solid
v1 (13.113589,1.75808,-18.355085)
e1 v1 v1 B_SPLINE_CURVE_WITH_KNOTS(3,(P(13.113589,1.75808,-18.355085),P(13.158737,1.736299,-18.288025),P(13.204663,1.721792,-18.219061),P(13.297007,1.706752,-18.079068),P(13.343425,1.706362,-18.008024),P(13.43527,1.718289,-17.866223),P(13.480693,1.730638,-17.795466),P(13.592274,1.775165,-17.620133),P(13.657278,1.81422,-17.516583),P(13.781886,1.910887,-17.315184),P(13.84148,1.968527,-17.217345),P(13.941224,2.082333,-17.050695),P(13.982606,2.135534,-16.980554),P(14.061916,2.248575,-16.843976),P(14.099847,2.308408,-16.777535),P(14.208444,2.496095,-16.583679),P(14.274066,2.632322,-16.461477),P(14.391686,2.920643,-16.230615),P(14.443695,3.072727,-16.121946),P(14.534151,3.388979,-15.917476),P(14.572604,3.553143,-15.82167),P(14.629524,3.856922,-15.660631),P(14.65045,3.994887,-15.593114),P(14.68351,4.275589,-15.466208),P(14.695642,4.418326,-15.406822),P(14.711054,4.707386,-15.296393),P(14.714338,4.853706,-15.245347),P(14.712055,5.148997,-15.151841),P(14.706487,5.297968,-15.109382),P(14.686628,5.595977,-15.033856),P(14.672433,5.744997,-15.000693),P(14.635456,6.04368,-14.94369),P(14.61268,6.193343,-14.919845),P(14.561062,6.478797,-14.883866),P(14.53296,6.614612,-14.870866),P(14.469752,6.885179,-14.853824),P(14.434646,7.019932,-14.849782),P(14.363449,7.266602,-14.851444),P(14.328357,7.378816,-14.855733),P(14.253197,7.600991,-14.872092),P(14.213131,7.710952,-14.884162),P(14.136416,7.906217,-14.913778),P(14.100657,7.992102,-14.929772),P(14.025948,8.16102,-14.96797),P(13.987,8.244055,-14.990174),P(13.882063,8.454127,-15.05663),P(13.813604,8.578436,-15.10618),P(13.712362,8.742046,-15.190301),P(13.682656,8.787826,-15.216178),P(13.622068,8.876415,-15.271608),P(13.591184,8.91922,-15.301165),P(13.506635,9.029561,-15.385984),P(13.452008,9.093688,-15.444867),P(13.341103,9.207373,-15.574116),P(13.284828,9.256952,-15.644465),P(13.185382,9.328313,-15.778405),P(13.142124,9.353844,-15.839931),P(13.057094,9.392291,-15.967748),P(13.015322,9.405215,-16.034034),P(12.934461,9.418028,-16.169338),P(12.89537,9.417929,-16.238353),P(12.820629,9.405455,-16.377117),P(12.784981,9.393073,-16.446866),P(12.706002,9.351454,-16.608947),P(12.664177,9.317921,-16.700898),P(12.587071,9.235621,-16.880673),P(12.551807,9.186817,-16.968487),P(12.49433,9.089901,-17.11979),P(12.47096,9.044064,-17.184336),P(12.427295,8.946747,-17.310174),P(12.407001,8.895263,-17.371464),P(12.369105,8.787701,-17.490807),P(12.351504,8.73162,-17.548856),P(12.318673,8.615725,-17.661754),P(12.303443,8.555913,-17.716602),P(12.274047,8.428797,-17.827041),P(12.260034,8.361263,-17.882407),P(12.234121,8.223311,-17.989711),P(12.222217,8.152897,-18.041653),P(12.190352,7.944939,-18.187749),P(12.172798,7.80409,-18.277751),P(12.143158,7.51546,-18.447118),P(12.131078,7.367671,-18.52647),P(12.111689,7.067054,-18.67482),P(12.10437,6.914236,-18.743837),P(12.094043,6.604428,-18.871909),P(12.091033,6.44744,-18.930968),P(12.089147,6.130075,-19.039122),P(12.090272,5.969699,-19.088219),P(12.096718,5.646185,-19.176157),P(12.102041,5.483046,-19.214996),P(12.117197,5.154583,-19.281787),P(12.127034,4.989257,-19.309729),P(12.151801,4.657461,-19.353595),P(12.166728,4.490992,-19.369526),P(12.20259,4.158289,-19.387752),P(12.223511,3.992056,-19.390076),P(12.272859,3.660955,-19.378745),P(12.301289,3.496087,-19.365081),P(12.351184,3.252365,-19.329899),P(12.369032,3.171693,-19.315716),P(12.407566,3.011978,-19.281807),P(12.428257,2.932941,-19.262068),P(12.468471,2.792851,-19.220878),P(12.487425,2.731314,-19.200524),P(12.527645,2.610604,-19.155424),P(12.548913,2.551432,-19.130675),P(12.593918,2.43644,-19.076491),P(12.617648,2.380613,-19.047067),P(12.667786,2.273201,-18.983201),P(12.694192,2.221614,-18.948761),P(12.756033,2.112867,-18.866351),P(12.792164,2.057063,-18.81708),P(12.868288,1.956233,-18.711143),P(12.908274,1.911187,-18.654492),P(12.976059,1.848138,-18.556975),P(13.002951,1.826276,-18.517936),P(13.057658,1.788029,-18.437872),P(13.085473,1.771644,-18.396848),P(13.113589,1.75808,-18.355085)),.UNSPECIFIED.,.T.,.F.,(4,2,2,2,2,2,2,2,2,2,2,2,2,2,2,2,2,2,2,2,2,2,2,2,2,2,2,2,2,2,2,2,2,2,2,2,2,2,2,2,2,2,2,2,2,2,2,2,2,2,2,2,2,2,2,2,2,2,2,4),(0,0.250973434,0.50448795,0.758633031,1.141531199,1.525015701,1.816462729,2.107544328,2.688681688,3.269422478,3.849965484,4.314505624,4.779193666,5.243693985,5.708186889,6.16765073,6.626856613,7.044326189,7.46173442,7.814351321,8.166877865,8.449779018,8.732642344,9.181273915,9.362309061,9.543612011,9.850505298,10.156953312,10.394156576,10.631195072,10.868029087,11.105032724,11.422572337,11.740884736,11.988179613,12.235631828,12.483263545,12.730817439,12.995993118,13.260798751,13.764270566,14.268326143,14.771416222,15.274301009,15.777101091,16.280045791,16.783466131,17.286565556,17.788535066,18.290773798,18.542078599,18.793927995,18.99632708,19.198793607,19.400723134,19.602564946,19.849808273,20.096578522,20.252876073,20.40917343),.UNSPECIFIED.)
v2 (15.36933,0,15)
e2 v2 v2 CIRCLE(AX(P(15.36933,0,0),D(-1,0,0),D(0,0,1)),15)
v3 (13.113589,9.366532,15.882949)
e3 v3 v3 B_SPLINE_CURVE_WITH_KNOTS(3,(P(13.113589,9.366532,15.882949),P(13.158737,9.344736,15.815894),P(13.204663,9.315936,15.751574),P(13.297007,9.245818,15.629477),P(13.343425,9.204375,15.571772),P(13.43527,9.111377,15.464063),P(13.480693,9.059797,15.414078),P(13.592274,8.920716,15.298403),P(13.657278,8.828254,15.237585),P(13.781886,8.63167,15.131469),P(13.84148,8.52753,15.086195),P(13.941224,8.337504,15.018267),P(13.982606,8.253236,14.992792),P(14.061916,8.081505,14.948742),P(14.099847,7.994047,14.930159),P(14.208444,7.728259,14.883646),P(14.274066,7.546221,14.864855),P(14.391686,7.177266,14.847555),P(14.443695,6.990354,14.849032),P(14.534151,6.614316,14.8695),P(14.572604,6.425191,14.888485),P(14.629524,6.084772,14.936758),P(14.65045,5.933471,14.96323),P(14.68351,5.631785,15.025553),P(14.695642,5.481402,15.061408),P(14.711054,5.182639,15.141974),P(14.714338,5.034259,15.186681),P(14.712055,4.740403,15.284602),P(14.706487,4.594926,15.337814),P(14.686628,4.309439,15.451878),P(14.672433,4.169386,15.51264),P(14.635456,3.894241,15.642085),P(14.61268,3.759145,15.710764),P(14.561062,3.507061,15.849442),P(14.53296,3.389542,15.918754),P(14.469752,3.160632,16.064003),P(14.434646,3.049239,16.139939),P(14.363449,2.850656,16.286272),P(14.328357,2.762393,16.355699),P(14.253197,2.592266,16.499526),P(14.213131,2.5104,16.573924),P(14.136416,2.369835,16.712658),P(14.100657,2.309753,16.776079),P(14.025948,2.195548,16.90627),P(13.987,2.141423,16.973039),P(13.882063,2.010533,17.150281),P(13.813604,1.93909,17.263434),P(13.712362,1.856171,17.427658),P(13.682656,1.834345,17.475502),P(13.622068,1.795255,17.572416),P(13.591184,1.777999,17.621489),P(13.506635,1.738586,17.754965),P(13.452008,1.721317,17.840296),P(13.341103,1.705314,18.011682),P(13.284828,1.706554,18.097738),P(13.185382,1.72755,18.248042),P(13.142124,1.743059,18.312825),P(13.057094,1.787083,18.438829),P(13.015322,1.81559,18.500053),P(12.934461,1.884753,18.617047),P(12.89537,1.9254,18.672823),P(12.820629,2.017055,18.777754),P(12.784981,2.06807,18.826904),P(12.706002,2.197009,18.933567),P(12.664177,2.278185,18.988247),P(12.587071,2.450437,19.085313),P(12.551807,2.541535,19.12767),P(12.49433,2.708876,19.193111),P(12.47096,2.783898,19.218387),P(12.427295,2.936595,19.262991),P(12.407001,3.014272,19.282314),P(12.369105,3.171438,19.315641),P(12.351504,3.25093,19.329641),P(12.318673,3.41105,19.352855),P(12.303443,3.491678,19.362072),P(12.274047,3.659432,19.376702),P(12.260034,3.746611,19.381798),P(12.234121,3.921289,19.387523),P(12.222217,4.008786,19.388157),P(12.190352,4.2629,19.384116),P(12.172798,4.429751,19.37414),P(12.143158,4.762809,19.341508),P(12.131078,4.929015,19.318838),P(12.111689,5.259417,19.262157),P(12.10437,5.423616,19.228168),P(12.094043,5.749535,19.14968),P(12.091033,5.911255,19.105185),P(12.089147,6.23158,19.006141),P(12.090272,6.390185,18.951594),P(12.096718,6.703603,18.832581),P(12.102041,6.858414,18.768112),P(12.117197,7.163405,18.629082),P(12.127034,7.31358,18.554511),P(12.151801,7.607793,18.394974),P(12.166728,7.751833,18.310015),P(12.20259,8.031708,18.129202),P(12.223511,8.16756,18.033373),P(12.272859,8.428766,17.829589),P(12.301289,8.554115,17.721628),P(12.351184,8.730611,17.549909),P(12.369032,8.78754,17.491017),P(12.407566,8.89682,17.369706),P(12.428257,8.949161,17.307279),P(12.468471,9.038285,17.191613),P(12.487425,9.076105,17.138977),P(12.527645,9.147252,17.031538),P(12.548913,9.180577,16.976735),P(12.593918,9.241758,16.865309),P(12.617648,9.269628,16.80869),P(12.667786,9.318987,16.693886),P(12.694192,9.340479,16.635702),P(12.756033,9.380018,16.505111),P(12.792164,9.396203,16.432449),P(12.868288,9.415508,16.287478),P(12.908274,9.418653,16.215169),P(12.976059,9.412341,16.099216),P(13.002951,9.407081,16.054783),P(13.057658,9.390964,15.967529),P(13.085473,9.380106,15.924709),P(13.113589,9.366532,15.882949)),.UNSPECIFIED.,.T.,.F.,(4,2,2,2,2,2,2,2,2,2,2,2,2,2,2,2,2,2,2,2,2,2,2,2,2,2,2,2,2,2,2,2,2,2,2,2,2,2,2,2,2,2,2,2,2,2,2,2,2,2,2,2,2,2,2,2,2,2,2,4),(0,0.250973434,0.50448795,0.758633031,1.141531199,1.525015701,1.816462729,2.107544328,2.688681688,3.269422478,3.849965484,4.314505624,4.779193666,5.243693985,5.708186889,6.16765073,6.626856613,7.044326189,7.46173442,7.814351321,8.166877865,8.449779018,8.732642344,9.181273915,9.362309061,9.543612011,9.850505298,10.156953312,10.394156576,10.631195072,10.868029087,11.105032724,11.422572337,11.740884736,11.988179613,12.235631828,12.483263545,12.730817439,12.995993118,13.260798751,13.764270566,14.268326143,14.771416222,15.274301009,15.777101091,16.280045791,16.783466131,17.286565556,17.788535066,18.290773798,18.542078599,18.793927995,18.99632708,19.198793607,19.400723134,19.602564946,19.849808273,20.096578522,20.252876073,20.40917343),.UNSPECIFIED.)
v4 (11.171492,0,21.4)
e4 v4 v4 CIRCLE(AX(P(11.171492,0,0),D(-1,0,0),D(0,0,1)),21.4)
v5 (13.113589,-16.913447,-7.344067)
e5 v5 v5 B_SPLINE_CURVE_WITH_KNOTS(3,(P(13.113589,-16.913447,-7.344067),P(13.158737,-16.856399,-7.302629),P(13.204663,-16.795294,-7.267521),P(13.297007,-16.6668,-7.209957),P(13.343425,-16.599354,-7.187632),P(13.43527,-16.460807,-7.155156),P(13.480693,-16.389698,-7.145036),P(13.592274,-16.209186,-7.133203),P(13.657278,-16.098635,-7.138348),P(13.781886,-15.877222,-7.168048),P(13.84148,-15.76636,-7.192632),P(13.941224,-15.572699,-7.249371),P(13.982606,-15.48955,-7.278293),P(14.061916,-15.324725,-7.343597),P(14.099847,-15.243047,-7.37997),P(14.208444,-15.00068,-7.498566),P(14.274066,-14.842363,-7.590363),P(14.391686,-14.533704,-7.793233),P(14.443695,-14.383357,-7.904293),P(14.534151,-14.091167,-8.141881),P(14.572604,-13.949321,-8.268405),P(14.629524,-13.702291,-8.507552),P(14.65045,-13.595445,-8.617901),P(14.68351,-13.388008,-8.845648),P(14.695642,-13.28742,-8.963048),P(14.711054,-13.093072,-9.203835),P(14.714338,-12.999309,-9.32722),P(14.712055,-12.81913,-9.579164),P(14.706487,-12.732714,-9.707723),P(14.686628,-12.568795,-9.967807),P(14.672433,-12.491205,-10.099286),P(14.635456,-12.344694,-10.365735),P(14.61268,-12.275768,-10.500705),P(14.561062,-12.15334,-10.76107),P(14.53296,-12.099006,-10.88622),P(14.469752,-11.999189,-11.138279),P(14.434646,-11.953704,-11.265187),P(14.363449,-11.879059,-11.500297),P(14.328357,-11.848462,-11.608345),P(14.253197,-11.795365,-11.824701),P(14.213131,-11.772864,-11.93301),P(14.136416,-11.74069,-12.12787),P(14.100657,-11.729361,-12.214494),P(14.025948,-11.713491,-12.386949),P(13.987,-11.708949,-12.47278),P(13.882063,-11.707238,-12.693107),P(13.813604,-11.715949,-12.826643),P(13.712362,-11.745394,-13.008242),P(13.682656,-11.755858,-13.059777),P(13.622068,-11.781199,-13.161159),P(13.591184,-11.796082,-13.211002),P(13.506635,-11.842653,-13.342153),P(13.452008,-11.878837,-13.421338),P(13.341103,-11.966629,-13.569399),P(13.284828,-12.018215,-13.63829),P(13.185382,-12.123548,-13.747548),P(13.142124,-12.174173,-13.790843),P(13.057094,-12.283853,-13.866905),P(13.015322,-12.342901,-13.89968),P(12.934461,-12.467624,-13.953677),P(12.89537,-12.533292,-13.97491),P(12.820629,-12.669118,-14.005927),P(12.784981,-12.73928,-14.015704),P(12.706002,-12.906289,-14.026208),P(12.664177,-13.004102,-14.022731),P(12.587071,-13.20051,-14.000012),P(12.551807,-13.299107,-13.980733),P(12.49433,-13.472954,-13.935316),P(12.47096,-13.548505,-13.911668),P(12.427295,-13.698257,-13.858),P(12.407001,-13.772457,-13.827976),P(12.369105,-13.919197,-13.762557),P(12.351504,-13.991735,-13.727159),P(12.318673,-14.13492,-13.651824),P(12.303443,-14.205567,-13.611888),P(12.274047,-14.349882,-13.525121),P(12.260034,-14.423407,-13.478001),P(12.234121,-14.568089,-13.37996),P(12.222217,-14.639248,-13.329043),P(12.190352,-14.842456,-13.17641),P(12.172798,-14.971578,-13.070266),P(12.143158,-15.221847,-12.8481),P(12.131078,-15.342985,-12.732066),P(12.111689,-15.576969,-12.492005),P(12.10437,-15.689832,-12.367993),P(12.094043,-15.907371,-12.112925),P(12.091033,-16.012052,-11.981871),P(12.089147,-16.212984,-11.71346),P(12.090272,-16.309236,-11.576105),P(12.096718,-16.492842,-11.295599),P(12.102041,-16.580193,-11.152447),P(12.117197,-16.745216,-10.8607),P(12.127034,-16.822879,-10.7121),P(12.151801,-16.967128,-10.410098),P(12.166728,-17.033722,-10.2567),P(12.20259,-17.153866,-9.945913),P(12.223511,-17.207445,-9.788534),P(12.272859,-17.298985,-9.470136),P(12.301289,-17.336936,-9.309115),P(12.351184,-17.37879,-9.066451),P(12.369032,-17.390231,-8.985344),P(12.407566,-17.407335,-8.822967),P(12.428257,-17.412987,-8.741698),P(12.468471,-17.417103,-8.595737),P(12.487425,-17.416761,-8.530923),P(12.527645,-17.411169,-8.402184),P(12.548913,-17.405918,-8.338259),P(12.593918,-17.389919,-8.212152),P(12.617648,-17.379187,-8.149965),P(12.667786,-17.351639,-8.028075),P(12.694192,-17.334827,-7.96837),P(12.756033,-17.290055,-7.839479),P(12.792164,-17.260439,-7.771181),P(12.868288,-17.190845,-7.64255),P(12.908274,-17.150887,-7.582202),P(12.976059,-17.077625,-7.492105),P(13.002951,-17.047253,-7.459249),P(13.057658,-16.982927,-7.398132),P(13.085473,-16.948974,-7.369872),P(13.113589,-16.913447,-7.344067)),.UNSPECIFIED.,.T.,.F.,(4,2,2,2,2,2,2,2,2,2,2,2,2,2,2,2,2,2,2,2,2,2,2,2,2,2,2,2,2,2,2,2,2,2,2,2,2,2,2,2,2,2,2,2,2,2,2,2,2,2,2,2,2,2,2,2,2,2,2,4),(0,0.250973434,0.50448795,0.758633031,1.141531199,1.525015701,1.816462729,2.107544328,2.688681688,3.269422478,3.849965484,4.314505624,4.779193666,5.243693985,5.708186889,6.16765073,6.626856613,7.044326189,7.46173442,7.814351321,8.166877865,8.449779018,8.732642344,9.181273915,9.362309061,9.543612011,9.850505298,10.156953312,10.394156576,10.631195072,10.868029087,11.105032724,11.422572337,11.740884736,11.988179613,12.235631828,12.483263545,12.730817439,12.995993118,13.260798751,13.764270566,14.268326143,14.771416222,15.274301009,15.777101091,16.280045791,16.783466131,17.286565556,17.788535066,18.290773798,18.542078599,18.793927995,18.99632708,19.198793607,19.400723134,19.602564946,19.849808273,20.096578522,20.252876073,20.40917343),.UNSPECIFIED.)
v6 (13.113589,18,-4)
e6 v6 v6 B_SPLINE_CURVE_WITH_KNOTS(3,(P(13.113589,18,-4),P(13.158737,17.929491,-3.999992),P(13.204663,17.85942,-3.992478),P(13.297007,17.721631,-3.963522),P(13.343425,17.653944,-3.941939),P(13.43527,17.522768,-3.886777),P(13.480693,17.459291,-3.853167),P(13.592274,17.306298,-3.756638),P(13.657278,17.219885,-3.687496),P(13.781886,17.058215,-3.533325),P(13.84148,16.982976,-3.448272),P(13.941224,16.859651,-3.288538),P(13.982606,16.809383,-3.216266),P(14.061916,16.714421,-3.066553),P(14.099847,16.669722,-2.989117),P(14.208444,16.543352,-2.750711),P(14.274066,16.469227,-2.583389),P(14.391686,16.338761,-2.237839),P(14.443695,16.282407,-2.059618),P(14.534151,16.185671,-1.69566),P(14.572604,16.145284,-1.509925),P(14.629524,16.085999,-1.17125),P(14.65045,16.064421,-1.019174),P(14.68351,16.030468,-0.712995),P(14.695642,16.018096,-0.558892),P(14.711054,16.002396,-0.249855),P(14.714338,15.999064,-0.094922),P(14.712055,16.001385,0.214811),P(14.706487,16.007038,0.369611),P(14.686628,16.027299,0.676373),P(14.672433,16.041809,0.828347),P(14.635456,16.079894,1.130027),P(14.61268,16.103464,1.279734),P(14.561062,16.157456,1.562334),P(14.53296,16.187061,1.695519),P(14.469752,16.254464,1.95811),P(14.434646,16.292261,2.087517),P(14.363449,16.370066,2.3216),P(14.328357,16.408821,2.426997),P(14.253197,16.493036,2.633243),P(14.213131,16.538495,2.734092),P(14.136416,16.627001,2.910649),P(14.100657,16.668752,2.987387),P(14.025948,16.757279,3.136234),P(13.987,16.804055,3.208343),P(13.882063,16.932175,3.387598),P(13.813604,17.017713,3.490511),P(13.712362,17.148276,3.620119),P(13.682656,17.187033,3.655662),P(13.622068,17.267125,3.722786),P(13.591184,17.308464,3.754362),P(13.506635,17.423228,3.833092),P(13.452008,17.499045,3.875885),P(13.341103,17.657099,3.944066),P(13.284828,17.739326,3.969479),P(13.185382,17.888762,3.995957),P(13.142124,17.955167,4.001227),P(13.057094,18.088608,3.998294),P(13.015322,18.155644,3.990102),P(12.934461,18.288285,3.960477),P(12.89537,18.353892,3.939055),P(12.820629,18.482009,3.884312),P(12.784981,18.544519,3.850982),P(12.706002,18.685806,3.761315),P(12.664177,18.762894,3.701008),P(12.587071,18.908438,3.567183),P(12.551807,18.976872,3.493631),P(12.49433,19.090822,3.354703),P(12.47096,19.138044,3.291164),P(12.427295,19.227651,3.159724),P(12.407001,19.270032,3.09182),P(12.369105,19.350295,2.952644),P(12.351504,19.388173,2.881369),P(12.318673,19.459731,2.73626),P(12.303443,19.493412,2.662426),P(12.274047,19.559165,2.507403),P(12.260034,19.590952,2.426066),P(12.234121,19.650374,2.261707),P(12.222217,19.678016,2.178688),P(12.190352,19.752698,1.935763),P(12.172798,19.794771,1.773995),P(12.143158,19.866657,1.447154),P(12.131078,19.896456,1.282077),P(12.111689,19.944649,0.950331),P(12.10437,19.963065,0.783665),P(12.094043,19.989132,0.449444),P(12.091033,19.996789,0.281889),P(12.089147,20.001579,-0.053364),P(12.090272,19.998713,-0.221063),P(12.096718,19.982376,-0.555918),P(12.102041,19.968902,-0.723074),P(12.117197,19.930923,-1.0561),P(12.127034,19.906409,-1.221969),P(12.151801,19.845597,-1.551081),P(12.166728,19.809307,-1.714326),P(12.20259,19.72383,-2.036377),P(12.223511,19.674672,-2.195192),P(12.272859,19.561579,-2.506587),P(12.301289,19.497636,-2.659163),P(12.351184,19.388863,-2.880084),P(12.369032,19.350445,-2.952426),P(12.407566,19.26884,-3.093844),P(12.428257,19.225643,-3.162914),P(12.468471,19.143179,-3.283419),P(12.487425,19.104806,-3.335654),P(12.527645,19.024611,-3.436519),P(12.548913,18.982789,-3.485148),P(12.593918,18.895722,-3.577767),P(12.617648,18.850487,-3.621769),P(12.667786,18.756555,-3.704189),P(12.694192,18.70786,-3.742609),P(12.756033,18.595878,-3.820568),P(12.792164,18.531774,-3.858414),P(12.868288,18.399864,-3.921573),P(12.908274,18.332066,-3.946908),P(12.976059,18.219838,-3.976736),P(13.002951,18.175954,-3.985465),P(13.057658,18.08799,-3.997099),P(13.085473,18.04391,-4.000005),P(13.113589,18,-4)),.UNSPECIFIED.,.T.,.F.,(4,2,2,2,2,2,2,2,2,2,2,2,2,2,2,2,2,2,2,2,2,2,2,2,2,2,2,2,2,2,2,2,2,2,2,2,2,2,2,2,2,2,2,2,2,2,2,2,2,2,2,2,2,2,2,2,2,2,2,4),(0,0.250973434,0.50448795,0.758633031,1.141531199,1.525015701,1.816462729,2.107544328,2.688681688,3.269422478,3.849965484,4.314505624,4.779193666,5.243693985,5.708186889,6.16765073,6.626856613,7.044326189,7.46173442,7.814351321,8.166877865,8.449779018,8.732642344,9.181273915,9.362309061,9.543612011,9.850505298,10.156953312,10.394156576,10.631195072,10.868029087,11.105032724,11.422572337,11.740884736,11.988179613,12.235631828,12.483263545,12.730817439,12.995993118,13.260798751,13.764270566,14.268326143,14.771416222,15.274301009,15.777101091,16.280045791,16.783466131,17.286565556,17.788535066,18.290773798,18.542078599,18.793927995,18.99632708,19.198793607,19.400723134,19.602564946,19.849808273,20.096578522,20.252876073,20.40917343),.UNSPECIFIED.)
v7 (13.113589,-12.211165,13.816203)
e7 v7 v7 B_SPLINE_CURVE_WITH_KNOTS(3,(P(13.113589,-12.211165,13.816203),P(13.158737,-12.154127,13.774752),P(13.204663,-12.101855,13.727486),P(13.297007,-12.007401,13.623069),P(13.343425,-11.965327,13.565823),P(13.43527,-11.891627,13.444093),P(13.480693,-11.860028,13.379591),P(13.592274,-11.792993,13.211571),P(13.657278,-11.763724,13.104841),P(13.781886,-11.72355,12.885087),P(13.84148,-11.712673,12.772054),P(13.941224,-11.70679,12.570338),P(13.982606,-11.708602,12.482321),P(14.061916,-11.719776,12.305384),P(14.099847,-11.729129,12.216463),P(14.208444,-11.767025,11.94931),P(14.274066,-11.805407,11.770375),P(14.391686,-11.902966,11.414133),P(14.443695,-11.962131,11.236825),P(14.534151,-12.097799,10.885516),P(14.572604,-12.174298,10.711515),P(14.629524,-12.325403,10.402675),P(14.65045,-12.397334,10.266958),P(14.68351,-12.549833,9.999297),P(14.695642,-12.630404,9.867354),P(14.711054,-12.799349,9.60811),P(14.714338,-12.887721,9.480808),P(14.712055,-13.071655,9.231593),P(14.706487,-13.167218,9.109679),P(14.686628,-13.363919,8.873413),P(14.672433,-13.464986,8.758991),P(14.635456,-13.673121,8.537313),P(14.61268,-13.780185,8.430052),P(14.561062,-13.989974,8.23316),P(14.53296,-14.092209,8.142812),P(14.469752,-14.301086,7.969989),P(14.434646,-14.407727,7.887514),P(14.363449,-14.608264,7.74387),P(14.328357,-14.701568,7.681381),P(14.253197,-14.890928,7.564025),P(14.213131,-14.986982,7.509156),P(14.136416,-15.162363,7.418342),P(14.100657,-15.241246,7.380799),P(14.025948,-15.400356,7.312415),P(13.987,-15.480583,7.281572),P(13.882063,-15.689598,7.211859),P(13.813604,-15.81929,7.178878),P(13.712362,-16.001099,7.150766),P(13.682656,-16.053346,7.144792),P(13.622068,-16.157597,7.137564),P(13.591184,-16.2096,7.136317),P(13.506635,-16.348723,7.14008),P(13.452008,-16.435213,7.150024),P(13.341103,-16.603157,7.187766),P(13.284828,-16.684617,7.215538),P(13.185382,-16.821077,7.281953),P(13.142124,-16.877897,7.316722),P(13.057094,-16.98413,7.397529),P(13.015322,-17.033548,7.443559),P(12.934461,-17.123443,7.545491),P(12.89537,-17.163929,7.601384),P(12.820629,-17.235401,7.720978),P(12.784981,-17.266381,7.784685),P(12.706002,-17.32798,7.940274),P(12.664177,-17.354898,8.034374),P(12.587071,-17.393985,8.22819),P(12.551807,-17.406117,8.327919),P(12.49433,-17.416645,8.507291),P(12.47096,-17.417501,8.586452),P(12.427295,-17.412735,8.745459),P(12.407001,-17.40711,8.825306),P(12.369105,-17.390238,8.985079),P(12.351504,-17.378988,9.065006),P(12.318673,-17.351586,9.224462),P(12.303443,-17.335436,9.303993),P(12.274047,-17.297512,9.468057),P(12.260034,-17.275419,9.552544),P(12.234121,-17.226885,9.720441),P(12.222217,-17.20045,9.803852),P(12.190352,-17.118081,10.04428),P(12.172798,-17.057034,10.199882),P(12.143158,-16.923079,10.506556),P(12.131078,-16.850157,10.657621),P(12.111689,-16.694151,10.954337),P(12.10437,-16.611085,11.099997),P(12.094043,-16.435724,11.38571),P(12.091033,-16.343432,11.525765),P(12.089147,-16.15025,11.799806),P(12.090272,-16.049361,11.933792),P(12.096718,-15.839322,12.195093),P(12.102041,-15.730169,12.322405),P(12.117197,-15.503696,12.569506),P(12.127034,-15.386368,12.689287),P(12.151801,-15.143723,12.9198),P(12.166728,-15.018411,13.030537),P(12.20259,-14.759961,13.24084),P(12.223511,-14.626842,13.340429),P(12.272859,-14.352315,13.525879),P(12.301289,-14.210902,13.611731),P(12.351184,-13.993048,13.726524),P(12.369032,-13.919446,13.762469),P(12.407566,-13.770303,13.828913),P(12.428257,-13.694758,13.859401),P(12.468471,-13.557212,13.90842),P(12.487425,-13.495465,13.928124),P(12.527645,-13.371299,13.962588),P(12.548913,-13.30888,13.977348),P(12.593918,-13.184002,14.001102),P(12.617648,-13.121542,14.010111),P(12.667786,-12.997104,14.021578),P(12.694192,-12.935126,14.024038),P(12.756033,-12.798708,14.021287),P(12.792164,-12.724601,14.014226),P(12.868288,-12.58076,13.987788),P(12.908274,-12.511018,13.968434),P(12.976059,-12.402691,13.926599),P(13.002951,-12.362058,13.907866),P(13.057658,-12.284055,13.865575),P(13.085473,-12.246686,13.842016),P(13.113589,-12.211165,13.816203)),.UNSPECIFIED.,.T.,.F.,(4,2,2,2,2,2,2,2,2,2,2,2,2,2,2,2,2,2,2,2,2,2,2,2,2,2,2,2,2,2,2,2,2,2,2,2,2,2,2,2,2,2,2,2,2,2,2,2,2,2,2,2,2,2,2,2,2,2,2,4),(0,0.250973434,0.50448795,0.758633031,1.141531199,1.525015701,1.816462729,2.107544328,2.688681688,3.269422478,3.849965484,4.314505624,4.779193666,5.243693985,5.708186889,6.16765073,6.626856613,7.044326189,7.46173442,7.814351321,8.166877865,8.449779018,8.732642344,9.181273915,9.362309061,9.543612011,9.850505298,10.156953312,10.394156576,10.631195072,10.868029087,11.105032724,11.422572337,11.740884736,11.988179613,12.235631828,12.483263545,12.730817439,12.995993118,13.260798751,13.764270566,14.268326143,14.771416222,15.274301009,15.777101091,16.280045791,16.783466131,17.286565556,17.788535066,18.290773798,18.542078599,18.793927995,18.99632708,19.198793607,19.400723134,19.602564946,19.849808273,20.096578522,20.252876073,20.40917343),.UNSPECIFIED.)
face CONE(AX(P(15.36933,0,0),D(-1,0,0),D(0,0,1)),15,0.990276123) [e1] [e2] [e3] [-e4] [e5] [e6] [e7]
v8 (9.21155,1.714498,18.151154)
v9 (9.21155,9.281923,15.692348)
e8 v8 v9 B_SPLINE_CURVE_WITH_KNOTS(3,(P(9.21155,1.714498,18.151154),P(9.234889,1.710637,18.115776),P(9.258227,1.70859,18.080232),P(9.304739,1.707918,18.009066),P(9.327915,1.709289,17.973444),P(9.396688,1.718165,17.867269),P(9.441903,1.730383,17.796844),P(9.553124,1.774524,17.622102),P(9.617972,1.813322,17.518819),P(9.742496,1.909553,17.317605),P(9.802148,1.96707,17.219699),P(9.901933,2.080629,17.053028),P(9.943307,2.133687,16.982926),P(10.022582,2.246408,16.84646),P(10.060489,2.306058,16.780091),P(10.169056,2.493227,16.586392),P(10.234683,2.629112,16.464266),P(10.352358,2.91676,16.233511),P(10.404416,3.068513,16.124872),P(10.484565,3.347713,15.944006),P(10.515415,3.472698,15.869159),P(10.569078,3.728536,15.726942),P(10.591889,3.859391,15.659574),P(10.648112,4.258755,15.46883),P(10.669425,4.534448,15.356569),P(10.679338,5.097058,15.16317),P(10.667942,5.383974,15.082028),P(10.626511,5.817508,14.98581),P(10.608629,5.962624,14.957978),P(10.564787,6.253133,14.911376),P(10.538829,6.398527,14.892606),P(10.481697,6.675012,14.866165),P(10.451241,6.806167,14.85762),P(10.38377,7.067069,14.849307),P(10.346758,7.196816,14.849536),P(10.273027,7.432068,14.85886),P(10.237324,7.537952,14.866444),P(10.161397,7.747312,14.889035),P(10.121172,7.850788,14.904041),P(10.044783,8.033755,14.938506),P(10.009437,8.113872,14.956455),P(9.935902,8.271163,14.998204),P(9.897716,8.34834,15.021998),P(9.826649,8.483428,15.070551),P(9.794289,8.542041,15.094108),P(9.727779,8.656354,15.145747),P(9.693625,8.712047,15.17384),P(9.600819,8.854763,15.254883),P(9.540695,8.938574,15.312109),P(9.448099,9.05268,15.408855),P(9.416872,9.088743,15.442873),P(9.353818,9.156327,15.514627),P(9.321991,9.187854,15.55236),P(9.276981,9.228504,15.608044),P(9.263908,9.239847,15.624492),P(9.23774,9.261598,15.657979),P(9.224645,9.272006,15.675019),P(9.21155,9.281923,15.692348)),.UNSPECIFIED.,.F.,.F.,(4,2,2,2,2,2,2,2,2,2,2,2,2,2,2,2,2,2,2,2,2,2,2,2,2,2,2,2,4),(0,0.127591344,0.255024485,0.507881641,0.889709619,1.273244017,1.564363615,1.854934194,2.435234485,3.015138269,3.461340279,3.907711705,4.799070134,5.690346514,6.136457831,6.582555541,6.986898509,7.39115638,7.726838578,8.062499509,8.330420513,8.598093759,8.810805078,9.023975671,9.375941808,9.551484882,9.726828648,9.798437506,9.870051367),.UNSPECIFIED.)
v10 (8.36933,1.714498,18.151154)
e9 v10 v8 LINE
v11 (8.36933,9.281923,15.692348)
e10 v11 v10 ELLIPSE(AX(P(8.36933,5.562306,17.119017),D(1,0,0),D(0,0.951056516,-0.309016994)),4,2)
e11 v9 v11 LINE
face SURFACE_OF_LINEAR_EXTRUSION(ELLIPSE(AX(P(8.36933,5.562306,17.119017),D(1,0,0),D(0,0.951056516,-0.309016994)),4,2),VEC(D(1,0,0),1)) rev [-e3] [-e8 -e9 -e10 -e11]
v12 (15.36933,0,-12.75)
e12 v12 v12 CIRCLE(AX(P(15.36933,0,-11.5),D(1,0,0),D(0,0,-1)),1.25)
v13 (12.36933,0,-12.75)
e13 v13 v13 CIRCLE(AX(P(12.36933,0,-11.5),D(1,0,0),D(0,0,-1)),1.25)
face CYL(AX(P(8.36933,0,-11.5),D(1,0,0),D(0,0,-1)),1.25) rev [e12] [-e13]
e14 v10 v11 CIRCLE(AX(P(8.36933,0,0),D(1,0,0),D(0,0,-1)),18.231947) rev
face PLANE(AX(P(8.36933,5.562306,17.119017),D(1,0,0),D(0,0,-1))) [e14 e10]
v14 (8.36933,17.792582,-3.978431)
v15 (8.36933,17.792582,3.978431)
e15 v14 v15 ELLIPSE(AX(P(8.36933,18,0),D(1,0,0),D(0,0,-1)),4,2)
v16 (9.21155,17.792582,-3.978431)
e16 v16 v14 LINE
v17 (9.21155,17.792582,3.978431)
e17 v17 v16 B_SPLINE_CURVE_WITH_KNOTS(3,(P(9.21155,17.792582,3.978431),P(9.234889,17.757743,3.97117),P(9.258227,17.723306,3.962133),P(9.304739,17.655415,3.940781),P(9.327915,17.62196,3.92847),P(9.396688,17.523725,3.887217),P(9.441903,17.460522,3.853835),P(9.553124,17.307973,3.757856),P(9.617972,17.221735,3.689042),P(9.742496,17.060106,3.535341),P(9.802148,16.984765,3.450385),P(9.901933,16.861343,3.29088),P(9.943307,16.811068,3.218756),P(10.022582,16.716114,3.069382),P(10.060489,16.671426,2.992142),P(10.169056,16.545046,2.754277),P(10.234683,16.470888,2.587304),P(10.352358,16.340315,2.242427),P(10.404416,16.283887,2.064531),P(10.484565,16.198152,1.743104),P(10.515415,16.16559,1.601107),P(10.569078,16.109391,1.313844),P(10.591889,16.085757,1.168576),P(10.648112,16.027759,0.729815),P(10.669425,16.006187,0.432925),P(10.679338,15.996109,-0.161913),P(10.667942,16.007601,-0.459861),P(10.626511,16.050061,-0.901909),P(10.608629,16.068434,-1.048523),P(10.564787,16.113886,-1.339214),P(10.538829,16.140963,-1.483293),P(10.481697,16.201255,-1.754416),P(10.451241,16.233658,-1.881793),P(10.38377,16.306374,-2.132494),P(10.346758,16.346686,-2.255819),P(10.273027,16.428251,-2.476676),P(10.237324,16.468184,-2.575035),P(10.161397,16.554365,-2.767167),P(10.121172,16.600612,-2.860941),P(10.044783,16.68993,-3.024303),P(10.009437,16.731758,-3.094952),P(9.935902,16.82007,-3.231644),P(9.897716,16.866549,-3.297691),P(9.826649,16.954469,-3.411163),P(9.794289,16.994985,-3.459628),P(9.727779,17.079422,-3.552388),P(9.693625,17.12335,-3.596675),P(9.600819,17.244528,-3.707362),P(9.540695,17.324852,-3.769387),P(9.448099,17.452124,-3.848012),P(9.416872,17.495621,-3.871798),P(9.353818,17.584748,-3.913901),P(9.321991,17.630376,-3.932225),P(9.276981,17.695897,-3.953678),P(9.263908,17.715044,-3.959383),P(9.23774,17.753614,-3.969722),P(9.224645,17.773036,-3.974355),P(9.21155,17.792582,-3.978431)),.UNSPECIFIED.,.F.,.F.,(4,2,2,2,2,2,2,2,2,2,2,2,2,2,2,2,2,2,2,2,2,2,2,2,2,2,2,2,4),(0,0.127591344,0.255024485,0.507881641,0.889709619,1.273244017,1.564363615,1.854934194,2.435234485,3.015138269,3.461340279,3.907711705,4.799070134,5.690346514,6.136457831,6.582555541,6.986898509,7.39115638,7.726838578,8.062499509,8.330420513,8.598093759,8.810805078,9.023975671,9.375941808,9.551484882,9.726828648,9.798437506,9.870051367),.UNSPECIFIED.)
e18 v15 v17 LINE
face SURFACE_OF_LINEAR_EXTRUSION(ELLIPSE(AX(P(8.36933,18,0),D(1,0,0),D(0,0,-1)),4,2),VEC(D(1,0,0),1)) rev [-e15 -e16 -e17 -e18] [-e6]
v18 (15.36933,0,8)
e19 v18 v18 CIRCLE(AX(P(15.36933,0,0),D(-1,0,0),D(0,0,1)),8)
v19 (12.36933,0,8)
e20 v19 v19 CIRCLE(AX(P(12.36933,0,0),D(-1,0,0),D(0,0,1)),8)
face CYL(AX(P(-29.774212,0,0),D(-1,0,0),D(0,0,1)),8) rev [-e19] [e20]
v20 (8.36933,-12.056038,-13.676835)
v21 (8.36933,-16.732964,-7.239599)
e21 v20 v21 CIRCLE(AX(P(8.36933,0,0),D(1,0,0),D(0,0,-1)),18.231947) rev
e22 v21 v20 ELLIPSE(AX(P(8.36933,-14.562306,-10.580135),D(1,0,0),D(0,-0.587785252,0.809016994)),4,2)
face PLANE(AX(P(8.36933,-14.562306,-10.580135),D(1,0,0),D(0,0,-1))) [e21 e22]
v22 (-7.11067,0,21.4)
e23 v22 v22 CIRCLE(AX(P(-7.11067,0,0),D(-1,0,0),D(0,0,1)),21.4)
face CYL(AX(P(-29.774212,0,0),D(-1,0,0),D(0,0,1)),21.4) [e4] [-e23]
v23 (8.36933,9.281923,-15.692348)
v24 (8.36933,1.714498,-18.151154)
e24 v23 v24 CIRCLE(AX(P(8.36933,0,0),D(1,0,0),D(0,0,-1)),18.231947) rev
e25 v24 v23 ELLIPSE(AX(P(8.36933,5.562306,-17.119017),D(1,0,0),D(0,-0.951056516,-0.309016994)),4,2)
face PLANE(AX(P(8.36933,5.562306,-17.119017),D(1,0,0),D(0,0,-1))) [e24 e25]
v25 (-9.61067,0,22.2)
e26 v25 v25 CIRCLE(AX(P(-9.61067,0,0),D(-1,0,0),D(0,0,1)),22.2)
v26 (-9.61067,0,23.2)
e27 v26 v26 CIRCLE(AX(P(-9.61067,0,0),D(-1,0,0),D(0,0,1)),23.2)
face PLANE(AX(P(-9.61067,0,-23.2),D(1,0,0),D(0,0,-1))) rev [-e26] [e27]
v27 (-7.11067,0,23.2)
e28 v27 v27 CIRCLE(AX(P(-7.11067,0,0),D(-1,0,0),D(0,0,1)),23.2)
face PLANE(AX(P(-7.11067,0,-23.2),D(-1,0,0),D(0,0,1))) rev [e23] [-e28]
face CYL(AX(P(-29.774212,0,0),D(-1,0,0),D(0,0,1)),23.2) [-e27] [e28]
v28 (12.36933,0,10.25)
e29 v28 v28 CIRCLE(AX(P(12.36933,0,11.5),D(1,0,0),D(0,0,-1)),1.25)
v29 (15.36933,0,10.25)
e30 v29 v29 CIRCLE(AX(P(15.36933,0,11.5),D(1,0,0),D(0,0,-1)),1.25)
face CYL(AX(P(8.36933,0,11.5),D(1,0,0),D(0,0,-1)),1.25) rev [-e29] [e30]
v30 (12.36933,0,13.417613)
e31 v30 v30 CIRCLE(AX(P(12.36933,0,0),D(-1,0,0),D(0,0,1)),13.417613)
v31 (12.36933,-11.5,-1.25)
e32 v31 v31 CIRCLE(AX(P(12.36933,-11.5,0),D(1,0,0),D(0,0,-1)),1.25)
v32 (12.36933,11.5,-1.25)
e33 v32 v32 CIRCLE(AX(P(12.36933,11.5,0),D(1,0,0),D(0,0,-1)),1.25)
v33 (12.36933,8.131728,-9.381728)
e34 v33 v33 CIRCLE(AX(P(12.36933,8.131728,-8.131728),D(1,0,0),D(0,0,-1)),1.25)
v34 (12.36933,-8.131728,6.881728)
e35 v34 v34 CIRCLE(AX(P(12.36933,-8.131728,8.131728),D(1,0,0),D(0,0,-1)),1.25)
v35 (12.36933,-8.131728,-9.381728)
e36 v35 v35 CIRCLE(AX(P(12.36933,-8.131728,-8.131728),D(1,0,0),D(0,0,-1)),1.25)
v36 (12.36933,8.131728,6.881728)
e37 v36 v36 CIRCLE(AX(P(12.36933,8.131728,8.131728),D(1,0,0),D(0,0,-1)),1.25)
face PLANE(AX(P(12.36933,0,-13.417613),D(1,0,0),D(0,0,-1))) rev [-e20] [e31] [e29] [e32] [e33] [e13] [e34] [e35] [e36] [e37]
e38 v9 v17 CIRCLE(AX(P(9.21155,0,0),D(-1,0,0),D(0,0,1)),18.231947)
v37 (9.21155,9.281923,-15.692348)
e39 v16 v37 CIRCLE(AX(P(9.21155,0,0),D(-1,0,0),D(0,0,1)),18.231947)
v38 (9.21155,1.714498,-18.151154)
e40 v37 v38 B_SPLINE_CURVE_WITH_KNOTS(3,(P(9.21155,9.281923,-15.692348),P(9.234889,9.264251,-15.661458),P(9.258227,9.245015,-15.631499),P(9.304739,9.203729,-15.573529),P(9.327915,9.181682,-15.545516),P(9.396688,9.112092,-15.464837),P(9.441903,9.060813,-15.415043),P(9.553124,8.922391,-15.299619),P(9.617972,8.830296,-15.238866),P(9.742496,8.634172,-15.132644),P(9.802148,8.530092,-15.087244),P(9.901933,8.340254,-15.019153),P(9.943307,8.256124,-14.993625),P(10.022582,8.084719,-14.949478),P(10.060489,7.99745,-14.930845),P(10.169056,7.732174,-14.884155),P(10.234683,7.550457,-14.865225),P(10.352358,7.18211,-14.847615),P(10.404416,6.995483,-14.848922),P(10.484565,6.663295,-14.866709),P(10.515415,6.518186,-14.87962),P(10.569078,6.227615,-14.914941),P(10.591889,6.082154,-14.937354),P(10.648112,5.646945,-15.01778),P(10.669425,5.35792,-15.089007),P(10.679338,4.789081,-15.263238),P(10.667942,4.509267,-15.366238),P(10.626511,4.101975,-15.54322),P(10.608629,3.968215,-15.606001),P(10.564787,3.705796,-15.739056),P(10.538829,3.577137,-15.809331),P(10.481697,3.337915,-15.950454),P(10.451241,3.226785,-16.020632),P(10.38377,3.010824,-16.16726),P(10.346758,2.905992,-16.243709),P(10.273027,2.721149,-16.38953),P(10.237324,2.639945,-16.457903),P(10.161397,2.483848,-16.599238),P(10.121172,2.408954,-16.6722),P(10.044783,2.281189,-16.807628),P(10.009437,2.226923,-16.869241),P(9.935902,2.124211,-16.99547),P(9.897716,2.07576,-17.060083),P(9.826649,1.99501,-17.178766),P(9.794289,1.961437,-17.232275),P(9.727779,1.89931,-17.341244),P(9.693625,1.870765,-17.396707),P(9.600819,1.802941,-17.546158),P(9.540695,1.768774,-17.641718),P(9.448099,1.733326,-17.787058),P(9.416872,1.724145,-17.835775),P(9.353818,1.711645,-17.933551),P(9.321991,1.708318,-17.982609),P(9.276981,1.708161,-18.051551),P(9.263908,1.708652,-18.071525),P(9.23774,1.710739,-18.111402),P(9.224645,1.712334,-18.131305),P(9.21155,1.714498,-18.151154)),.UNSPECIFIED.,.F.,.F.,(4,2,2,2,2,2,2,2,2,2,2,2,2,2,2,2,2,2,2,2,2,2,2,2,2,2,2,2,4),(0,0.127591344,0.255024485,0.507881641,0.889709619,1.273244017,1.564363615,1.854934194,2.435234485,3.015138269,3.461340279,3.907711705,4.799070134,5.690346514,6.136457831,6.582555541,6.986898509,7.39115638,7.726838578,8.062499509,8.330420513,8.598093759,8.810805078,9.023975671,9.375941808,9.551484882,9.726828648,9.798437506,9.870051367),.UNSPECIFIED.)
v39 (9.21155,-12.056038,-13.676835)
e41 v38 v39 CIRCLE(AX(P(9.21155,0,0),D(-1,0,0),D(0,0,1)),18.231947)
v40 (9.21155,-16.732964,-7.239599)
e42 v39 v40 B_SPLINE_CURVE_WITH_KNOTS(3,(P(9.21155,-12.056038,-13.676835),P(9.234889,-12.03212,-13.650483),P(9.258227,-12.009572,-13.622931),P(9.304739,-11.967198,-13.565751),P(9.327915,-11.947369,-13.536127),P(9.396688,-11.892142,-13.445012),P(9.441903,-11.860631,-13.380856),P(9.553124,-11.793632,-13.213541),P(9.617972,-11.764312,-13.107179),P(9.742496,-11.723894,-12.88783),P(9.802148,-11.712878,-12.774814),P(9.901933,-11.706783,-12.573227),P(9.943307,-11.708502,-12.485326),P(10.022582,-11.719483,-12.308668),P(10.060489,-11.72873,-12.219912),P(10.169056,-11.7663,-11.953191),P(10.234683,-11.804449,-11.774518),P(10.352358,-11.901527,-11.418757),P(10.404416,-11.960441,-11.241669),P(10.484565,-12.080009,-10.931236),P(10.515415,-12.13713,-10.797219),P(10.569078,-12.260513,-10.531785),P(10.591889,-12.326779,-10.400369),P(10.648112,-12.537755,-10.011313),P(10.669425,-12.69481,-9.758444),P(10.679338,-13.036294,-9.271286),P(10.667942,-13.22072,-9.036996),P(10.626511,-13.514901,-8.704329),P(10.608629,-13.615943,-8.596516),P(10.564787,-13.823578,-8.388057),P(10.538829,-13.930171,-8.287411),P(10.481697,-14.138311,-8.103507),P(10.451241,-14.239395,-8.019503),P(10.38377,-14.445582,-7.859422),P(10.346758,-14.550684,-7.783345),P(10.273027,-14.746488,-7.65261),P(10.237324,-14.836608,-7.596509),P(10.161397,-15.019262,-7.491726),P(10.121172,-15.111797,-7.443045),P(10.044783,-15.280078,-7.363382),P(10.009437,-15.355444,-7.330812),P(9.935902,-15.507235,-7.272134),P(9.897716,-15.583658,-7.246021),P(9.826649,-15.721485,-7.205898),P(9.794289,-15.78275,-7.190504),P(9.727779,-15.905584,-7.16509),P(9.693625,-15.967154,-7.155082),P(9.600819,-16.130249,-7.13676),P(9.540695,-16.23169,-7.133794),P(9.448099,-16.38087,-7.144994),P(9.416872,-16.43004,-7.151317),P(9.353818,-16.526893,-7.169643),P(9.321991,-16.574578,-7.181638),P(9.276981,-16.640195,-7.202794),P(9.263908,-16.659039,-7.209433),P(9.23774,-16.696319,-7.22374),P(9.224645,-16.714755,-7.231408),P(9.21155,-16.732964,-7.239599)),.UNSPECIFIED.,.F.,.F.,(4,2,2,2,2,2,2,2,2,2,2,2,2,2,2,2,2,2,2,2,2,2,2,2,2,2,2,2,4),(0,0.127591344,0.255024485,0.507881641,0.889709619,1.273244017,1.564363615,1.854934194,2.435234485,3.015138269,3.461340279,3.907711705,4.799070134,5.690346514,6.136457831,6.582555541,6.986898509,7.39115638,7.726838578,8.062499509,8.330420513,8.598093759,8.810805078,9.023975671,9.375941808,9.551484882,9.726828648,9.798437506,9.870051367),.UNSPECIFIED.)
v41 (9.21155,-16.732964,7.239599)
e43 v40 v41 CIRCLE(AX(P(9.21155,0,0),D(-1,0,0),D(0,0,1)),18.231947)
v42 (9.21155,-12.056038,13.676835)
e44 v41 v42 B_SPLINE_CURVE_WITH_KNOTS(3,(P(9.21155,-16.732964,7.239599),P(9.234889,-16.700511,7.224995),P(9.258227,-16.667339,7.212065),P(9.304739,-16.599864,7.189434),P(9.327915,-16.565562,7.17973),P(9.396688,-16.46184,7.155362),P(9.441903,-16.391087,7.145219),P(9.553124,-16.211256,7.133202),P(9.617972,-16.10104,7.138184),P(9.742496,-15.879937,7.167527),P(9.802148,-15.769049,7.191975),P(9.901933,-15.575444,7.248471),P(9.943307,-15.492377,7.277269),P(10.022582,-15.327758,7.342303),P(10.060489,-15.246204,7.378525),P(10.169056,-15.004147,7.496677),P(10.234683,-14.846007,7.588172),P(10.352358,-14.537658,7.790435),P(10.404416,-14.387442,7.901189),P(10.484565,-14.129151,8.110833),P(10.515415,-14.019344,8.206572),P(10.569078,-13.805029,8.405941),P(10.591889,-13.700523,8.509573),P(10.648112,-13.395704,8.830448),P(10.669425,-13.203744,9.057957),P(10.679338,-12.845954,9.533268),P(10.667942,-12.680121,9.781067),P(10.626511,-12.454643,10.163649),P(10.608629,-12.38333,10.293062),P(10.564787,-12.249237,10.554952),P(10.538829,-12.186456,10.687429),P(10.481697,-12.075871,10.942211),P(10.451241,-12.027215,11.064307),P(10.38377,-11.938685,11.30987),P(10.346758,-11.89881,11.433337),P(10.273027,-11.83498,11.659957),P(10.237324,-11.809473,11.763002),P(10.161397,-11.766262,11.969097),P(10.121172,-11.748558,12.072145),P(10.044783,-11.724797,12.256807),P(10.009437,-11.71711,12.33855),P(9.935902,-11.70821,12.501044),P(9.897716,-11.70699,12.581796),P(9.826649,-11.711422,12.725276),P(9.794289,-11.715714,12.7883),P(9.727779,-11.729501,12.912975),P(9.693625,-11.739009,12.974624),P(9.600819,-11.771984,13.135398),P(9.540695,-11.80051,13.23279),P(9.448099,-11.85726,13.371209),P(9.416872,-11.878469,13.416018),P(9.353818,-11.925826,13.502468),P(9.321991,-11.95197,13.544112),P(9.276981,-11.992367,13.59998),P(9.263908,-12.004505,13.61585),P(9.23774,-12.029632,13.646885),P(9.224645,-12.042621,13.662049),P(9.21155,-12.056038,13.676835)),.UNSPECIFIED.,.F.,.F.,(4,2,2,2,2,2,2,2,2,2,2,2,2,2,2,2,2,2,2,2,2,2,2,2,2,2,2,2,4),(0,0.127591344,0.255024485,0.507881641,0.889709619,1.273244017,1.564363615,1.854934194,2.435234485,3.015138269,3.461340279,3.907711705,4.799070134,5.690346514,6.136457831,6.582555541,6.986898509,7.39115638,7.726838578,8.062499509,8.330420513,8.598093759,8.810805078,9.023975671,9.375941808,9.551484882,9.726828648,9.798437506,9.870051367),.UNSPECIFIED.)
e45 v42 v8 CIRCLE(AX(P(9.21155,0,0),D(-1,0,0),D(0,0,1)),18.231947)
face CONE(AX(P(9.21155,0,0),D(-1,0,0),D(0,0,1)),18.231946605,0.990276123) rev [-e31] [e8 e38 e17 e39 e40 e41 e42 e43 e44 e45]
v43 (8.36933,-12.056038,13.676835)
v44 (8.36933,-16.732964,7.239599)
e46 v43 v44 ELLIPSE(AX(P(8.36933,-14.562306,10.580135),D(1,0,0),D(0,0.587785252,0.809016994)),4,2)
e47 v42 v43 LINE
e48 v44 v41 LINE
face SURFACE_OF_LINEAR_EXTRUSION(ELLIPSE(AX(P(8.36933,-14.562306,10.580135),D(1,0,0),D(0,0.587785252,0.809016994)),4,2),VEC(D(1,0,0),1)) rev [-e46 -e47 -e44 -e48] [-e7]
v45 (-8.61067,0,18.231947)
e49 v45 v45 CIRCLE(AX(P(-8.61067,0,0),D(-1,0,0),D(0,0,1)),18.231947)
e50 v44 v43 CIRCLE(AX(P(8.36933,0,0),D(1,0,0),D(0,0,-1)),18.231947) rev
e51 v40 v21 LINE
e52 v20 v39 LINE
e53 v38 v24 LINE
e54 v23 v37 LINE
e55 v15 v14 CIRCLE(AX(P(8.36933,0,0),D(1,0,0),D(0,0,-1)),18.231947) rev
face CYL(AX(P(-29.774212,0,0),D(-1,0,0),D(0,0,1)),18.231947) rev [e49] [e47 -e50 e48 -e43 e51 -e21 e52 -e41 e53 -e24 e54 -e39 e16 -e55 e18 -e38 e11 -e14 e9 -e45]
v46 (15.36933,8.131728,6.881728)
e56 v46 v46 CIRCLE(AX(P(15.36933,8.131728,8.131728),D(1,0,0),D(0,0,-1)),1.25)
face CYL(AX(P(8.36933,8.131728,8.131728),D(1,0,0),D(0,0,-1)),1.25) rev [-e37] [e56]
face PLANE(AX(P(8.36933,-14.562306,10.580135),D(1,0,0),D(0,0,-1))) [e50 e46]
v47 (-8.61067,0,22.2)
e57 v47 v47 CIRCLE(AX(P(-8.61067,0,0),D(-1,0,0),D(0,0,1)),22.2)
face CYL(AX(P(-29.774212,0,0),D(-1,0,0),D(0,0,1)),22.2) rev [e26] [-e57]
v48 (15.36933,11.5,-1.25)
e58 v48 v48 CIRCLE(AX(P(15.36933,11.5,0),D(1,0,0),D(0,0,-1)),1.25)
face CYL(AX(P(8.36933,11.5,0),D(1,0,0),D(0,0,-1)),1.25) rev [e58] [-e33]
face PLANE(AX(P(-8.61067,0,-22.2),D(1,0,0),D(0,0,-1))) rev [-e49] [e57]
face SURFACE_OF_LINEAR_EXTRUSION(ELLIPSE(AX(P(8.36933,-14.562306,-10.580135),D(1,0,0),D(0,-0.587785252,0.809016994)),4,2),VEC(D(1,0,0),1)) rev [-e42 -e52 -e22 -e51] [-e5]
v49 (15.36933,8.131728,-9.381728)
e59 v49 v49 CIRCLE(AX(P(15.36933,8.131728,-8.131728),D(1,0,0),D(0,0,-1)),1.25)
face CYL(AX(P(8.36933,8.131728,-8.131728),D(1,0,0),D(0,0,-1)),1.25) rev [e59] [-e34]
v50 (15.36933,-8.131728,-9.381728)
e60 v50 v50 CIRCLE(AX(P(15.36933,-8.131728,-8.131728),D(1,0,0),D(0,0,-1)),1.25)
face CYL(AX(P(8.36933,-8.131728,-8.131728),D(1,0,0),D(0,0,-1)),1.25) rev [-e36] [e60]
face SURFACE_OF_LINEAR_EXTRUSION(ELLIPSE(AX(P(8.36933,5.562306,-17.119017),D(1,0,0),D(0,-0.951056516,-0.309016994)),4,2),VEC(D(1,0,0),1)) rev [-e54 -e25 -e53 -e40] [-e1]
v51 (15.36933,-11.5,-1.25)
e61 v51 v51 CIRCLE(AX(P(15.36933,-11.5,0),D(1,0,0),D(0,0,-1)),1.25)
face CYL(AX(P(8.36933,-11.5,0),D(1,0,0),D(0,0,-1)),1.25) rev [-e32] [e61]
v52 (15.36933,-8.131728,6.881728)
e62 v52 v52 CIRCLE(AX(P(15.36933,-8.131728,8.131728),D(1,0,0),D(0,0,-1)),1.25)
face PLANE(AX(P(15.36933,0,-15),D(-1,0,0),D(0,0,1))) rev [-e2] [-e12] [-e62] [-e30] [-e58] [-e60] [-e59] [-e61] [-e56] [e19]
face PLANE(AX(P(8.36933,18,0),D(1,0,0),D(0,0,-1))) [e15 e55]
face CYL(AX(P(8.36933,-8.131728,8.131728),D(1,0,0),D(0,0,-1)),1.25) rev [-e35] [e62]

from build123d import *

# Parameters (mm, degrees)
CUT_EXTRUDE1_START     = -7
CUT_EXTRUDE1_OUTLINE_R = 1.25
CUT_EXTRUDE1_DEPTH     = 7


with BuildPart() as part:
    # Sketch3 → Revolve1 (revolve)
    with BuildSketch(Plane(origin=(0, 0, 0), x_dir=(1, 0, 0), z_dir=(0, 1, 0)), mode=Mode.PRIVATE) as revolve1_sk:
        Polygon((8.717608539, 21.4), (-7.11067022, 21.4), (-7.11067022, 23.2), (-8.61067022, 23.2), (-9.61067022, 23.2), (-9.61067022, 22.2), (-8.61067022, 22.2), (-8.61067022, 18.231946605), (9.211549898, 18.231946605), (12.36932978, 13.417613419), (12.36932978, 8), (15.36932978, 8), (15.36932978, 15), (11.171491687, 21.4), align=None)
    revolve(revolve1_sk.sketch.rotate(Axis((-29.774212385, 0, 0), (1, 0, 0)), 180), axis=Axis((-29.774212385, 0, 0), (1, 0, 0)))

    # Cut-Extrude1: read off the stored shape, not the designer's step
    # Cut-Extrude1 outline → Cut-Extrude1 (cut)
    with BuildSketch(Plane(origin=(15.36932978, 0, 0), x_dir=(0, 0, -1), z_dir=(1, 0, 0)).offset(CUT_EXTRUDE1_START)):
        with BuildLine():
            add(Edge.make_bspline(
                [(-15.882949316, 9.366531964), (-19.17750573, 10.436998233), (-19.384329489, 4.195426001), (-19.591153248, -2.046146232), (-16.089773075, 3.124959731), (-12.588392902, 8.296065695), (-15.882949316, 9.366531964)],
                knots=[0, 0, 0, 2.094395102, 2.094395102, 4.188790205, 4.188790205, 6.283185307, 6.283185307, 6.283185307], degree=2, weights=[1, 0.5, 1, 0.5, 1, 0.5, 1]))
        make_face()
        with BuildLine():
            add(Edge.make_bspline(
                [(-13.816202519, -12.21116489), (-15.852350361, -15.013681966), (-9.980174473, -17.139134942), (-4.107998586, -19.264587917), (-7.944026632, -14.336617865), (-11.780054677, -9.408647813), (-13.816202519, -12.21116489)],
                knots=[0, 0, 0, 2.094395102, 2.094395102, 4.188790205, 4.188790205, 6.283185307, 6.283185307, 6.283185307], degree=2, weights=[1, 0.5, 1, 0.5, 1, 0.5, 1]))
        make_face()
        with BuildLine():
            add(Edge.make_bspline(
                [(7.344066564, -16.913446908), (9.380214406, -19.715963985), (13.216242451, -14.787993933), (17.052270496, -9.86002388), (11.180094609, -11.985476856), (5.307918722, -14.110929831), (7.344066564, -16.913446908)],
                knots=[0, 0, 0, 2.094395102, 2.094395102, 4.188790205, 4.188790205, 6.283185307, 6.283185307, 6.283185307], degree=2, weights=[1, 0.5, 1, 0.5, 1, 0.5, 1]))
        make_face()
        with BuildLine():
            add(Edge.make_bspline(
                [(18.355085271, 1.758079834), (21.649641685, 2.828546103), (18.148261512, 7.999652066), (14.646881338, 13.170758029), (14.853705097, 6.929185797), (15.060528857, 0.687613564), (18.355085271, 1.758079834)],
                knots=[0, 0, 0, 2.094395102, 2.094395102, 4.188790205, 4.188790205, 6.283185307, 6.283185307, 6.283185307], degree=2, weights=[1, 0.5, 1, 0.5, 1, 0.5, 1]))
        make_face()
        with BuildLine():
            add(Edge.make_bspline(
                [(4, 18), (4, 21.464101615), (-2, 19.732050808), (-8, 18), (-2, 16.267949192), (4, 14.535898385), (4, 18)],
                knots=[0, 0, 0, 2.094395102, 2.094395102, 4.188790205, 4.188790205, 6.283185307, 6.283185307, 6.283185307], degree=2, weights=[1, 0.5, 1, 0.5, 1, 0.5, 1]))
        make_face()
        with Locations((0, 11.5)):
            Circle(CUT_EXTRUDE1_OUTLINE_R)
        with Locations((8.131727984, 8.131727984)):
            Circle(CUT_EXTRUDE1_OUTLINE_R)
        with Locations((11.5, 0)):
            Circle(CUT_EXTRUDE1_OUTLINE_R)
        with Locations((8.131727984, -8.131727984)):
            Circle(CUT_EXTRUDE1_OUTLINE_R)
        with Locations((0, -11.5)):
            Circle(CUT_EXTRUDE1_OUTLINE_R)
        with Locations((-8.131727984, -8.131727984)):
            Circle(CUT_EXTRUDE1_OUTLINE_R)
        with Locations((-11.5, 0)):
            Circle(CUT_EXTRUDE1_OUTLINE_R)
        with Locations((-8.131727984, 8.131727984)):
            Circle(CUT_EXTRUDE1_OUTLINE_R)
    extrude(amount=CUT_EXTRUDE1_DEPTH, mode=Mode.SUBTRACT)


solid = part.part
